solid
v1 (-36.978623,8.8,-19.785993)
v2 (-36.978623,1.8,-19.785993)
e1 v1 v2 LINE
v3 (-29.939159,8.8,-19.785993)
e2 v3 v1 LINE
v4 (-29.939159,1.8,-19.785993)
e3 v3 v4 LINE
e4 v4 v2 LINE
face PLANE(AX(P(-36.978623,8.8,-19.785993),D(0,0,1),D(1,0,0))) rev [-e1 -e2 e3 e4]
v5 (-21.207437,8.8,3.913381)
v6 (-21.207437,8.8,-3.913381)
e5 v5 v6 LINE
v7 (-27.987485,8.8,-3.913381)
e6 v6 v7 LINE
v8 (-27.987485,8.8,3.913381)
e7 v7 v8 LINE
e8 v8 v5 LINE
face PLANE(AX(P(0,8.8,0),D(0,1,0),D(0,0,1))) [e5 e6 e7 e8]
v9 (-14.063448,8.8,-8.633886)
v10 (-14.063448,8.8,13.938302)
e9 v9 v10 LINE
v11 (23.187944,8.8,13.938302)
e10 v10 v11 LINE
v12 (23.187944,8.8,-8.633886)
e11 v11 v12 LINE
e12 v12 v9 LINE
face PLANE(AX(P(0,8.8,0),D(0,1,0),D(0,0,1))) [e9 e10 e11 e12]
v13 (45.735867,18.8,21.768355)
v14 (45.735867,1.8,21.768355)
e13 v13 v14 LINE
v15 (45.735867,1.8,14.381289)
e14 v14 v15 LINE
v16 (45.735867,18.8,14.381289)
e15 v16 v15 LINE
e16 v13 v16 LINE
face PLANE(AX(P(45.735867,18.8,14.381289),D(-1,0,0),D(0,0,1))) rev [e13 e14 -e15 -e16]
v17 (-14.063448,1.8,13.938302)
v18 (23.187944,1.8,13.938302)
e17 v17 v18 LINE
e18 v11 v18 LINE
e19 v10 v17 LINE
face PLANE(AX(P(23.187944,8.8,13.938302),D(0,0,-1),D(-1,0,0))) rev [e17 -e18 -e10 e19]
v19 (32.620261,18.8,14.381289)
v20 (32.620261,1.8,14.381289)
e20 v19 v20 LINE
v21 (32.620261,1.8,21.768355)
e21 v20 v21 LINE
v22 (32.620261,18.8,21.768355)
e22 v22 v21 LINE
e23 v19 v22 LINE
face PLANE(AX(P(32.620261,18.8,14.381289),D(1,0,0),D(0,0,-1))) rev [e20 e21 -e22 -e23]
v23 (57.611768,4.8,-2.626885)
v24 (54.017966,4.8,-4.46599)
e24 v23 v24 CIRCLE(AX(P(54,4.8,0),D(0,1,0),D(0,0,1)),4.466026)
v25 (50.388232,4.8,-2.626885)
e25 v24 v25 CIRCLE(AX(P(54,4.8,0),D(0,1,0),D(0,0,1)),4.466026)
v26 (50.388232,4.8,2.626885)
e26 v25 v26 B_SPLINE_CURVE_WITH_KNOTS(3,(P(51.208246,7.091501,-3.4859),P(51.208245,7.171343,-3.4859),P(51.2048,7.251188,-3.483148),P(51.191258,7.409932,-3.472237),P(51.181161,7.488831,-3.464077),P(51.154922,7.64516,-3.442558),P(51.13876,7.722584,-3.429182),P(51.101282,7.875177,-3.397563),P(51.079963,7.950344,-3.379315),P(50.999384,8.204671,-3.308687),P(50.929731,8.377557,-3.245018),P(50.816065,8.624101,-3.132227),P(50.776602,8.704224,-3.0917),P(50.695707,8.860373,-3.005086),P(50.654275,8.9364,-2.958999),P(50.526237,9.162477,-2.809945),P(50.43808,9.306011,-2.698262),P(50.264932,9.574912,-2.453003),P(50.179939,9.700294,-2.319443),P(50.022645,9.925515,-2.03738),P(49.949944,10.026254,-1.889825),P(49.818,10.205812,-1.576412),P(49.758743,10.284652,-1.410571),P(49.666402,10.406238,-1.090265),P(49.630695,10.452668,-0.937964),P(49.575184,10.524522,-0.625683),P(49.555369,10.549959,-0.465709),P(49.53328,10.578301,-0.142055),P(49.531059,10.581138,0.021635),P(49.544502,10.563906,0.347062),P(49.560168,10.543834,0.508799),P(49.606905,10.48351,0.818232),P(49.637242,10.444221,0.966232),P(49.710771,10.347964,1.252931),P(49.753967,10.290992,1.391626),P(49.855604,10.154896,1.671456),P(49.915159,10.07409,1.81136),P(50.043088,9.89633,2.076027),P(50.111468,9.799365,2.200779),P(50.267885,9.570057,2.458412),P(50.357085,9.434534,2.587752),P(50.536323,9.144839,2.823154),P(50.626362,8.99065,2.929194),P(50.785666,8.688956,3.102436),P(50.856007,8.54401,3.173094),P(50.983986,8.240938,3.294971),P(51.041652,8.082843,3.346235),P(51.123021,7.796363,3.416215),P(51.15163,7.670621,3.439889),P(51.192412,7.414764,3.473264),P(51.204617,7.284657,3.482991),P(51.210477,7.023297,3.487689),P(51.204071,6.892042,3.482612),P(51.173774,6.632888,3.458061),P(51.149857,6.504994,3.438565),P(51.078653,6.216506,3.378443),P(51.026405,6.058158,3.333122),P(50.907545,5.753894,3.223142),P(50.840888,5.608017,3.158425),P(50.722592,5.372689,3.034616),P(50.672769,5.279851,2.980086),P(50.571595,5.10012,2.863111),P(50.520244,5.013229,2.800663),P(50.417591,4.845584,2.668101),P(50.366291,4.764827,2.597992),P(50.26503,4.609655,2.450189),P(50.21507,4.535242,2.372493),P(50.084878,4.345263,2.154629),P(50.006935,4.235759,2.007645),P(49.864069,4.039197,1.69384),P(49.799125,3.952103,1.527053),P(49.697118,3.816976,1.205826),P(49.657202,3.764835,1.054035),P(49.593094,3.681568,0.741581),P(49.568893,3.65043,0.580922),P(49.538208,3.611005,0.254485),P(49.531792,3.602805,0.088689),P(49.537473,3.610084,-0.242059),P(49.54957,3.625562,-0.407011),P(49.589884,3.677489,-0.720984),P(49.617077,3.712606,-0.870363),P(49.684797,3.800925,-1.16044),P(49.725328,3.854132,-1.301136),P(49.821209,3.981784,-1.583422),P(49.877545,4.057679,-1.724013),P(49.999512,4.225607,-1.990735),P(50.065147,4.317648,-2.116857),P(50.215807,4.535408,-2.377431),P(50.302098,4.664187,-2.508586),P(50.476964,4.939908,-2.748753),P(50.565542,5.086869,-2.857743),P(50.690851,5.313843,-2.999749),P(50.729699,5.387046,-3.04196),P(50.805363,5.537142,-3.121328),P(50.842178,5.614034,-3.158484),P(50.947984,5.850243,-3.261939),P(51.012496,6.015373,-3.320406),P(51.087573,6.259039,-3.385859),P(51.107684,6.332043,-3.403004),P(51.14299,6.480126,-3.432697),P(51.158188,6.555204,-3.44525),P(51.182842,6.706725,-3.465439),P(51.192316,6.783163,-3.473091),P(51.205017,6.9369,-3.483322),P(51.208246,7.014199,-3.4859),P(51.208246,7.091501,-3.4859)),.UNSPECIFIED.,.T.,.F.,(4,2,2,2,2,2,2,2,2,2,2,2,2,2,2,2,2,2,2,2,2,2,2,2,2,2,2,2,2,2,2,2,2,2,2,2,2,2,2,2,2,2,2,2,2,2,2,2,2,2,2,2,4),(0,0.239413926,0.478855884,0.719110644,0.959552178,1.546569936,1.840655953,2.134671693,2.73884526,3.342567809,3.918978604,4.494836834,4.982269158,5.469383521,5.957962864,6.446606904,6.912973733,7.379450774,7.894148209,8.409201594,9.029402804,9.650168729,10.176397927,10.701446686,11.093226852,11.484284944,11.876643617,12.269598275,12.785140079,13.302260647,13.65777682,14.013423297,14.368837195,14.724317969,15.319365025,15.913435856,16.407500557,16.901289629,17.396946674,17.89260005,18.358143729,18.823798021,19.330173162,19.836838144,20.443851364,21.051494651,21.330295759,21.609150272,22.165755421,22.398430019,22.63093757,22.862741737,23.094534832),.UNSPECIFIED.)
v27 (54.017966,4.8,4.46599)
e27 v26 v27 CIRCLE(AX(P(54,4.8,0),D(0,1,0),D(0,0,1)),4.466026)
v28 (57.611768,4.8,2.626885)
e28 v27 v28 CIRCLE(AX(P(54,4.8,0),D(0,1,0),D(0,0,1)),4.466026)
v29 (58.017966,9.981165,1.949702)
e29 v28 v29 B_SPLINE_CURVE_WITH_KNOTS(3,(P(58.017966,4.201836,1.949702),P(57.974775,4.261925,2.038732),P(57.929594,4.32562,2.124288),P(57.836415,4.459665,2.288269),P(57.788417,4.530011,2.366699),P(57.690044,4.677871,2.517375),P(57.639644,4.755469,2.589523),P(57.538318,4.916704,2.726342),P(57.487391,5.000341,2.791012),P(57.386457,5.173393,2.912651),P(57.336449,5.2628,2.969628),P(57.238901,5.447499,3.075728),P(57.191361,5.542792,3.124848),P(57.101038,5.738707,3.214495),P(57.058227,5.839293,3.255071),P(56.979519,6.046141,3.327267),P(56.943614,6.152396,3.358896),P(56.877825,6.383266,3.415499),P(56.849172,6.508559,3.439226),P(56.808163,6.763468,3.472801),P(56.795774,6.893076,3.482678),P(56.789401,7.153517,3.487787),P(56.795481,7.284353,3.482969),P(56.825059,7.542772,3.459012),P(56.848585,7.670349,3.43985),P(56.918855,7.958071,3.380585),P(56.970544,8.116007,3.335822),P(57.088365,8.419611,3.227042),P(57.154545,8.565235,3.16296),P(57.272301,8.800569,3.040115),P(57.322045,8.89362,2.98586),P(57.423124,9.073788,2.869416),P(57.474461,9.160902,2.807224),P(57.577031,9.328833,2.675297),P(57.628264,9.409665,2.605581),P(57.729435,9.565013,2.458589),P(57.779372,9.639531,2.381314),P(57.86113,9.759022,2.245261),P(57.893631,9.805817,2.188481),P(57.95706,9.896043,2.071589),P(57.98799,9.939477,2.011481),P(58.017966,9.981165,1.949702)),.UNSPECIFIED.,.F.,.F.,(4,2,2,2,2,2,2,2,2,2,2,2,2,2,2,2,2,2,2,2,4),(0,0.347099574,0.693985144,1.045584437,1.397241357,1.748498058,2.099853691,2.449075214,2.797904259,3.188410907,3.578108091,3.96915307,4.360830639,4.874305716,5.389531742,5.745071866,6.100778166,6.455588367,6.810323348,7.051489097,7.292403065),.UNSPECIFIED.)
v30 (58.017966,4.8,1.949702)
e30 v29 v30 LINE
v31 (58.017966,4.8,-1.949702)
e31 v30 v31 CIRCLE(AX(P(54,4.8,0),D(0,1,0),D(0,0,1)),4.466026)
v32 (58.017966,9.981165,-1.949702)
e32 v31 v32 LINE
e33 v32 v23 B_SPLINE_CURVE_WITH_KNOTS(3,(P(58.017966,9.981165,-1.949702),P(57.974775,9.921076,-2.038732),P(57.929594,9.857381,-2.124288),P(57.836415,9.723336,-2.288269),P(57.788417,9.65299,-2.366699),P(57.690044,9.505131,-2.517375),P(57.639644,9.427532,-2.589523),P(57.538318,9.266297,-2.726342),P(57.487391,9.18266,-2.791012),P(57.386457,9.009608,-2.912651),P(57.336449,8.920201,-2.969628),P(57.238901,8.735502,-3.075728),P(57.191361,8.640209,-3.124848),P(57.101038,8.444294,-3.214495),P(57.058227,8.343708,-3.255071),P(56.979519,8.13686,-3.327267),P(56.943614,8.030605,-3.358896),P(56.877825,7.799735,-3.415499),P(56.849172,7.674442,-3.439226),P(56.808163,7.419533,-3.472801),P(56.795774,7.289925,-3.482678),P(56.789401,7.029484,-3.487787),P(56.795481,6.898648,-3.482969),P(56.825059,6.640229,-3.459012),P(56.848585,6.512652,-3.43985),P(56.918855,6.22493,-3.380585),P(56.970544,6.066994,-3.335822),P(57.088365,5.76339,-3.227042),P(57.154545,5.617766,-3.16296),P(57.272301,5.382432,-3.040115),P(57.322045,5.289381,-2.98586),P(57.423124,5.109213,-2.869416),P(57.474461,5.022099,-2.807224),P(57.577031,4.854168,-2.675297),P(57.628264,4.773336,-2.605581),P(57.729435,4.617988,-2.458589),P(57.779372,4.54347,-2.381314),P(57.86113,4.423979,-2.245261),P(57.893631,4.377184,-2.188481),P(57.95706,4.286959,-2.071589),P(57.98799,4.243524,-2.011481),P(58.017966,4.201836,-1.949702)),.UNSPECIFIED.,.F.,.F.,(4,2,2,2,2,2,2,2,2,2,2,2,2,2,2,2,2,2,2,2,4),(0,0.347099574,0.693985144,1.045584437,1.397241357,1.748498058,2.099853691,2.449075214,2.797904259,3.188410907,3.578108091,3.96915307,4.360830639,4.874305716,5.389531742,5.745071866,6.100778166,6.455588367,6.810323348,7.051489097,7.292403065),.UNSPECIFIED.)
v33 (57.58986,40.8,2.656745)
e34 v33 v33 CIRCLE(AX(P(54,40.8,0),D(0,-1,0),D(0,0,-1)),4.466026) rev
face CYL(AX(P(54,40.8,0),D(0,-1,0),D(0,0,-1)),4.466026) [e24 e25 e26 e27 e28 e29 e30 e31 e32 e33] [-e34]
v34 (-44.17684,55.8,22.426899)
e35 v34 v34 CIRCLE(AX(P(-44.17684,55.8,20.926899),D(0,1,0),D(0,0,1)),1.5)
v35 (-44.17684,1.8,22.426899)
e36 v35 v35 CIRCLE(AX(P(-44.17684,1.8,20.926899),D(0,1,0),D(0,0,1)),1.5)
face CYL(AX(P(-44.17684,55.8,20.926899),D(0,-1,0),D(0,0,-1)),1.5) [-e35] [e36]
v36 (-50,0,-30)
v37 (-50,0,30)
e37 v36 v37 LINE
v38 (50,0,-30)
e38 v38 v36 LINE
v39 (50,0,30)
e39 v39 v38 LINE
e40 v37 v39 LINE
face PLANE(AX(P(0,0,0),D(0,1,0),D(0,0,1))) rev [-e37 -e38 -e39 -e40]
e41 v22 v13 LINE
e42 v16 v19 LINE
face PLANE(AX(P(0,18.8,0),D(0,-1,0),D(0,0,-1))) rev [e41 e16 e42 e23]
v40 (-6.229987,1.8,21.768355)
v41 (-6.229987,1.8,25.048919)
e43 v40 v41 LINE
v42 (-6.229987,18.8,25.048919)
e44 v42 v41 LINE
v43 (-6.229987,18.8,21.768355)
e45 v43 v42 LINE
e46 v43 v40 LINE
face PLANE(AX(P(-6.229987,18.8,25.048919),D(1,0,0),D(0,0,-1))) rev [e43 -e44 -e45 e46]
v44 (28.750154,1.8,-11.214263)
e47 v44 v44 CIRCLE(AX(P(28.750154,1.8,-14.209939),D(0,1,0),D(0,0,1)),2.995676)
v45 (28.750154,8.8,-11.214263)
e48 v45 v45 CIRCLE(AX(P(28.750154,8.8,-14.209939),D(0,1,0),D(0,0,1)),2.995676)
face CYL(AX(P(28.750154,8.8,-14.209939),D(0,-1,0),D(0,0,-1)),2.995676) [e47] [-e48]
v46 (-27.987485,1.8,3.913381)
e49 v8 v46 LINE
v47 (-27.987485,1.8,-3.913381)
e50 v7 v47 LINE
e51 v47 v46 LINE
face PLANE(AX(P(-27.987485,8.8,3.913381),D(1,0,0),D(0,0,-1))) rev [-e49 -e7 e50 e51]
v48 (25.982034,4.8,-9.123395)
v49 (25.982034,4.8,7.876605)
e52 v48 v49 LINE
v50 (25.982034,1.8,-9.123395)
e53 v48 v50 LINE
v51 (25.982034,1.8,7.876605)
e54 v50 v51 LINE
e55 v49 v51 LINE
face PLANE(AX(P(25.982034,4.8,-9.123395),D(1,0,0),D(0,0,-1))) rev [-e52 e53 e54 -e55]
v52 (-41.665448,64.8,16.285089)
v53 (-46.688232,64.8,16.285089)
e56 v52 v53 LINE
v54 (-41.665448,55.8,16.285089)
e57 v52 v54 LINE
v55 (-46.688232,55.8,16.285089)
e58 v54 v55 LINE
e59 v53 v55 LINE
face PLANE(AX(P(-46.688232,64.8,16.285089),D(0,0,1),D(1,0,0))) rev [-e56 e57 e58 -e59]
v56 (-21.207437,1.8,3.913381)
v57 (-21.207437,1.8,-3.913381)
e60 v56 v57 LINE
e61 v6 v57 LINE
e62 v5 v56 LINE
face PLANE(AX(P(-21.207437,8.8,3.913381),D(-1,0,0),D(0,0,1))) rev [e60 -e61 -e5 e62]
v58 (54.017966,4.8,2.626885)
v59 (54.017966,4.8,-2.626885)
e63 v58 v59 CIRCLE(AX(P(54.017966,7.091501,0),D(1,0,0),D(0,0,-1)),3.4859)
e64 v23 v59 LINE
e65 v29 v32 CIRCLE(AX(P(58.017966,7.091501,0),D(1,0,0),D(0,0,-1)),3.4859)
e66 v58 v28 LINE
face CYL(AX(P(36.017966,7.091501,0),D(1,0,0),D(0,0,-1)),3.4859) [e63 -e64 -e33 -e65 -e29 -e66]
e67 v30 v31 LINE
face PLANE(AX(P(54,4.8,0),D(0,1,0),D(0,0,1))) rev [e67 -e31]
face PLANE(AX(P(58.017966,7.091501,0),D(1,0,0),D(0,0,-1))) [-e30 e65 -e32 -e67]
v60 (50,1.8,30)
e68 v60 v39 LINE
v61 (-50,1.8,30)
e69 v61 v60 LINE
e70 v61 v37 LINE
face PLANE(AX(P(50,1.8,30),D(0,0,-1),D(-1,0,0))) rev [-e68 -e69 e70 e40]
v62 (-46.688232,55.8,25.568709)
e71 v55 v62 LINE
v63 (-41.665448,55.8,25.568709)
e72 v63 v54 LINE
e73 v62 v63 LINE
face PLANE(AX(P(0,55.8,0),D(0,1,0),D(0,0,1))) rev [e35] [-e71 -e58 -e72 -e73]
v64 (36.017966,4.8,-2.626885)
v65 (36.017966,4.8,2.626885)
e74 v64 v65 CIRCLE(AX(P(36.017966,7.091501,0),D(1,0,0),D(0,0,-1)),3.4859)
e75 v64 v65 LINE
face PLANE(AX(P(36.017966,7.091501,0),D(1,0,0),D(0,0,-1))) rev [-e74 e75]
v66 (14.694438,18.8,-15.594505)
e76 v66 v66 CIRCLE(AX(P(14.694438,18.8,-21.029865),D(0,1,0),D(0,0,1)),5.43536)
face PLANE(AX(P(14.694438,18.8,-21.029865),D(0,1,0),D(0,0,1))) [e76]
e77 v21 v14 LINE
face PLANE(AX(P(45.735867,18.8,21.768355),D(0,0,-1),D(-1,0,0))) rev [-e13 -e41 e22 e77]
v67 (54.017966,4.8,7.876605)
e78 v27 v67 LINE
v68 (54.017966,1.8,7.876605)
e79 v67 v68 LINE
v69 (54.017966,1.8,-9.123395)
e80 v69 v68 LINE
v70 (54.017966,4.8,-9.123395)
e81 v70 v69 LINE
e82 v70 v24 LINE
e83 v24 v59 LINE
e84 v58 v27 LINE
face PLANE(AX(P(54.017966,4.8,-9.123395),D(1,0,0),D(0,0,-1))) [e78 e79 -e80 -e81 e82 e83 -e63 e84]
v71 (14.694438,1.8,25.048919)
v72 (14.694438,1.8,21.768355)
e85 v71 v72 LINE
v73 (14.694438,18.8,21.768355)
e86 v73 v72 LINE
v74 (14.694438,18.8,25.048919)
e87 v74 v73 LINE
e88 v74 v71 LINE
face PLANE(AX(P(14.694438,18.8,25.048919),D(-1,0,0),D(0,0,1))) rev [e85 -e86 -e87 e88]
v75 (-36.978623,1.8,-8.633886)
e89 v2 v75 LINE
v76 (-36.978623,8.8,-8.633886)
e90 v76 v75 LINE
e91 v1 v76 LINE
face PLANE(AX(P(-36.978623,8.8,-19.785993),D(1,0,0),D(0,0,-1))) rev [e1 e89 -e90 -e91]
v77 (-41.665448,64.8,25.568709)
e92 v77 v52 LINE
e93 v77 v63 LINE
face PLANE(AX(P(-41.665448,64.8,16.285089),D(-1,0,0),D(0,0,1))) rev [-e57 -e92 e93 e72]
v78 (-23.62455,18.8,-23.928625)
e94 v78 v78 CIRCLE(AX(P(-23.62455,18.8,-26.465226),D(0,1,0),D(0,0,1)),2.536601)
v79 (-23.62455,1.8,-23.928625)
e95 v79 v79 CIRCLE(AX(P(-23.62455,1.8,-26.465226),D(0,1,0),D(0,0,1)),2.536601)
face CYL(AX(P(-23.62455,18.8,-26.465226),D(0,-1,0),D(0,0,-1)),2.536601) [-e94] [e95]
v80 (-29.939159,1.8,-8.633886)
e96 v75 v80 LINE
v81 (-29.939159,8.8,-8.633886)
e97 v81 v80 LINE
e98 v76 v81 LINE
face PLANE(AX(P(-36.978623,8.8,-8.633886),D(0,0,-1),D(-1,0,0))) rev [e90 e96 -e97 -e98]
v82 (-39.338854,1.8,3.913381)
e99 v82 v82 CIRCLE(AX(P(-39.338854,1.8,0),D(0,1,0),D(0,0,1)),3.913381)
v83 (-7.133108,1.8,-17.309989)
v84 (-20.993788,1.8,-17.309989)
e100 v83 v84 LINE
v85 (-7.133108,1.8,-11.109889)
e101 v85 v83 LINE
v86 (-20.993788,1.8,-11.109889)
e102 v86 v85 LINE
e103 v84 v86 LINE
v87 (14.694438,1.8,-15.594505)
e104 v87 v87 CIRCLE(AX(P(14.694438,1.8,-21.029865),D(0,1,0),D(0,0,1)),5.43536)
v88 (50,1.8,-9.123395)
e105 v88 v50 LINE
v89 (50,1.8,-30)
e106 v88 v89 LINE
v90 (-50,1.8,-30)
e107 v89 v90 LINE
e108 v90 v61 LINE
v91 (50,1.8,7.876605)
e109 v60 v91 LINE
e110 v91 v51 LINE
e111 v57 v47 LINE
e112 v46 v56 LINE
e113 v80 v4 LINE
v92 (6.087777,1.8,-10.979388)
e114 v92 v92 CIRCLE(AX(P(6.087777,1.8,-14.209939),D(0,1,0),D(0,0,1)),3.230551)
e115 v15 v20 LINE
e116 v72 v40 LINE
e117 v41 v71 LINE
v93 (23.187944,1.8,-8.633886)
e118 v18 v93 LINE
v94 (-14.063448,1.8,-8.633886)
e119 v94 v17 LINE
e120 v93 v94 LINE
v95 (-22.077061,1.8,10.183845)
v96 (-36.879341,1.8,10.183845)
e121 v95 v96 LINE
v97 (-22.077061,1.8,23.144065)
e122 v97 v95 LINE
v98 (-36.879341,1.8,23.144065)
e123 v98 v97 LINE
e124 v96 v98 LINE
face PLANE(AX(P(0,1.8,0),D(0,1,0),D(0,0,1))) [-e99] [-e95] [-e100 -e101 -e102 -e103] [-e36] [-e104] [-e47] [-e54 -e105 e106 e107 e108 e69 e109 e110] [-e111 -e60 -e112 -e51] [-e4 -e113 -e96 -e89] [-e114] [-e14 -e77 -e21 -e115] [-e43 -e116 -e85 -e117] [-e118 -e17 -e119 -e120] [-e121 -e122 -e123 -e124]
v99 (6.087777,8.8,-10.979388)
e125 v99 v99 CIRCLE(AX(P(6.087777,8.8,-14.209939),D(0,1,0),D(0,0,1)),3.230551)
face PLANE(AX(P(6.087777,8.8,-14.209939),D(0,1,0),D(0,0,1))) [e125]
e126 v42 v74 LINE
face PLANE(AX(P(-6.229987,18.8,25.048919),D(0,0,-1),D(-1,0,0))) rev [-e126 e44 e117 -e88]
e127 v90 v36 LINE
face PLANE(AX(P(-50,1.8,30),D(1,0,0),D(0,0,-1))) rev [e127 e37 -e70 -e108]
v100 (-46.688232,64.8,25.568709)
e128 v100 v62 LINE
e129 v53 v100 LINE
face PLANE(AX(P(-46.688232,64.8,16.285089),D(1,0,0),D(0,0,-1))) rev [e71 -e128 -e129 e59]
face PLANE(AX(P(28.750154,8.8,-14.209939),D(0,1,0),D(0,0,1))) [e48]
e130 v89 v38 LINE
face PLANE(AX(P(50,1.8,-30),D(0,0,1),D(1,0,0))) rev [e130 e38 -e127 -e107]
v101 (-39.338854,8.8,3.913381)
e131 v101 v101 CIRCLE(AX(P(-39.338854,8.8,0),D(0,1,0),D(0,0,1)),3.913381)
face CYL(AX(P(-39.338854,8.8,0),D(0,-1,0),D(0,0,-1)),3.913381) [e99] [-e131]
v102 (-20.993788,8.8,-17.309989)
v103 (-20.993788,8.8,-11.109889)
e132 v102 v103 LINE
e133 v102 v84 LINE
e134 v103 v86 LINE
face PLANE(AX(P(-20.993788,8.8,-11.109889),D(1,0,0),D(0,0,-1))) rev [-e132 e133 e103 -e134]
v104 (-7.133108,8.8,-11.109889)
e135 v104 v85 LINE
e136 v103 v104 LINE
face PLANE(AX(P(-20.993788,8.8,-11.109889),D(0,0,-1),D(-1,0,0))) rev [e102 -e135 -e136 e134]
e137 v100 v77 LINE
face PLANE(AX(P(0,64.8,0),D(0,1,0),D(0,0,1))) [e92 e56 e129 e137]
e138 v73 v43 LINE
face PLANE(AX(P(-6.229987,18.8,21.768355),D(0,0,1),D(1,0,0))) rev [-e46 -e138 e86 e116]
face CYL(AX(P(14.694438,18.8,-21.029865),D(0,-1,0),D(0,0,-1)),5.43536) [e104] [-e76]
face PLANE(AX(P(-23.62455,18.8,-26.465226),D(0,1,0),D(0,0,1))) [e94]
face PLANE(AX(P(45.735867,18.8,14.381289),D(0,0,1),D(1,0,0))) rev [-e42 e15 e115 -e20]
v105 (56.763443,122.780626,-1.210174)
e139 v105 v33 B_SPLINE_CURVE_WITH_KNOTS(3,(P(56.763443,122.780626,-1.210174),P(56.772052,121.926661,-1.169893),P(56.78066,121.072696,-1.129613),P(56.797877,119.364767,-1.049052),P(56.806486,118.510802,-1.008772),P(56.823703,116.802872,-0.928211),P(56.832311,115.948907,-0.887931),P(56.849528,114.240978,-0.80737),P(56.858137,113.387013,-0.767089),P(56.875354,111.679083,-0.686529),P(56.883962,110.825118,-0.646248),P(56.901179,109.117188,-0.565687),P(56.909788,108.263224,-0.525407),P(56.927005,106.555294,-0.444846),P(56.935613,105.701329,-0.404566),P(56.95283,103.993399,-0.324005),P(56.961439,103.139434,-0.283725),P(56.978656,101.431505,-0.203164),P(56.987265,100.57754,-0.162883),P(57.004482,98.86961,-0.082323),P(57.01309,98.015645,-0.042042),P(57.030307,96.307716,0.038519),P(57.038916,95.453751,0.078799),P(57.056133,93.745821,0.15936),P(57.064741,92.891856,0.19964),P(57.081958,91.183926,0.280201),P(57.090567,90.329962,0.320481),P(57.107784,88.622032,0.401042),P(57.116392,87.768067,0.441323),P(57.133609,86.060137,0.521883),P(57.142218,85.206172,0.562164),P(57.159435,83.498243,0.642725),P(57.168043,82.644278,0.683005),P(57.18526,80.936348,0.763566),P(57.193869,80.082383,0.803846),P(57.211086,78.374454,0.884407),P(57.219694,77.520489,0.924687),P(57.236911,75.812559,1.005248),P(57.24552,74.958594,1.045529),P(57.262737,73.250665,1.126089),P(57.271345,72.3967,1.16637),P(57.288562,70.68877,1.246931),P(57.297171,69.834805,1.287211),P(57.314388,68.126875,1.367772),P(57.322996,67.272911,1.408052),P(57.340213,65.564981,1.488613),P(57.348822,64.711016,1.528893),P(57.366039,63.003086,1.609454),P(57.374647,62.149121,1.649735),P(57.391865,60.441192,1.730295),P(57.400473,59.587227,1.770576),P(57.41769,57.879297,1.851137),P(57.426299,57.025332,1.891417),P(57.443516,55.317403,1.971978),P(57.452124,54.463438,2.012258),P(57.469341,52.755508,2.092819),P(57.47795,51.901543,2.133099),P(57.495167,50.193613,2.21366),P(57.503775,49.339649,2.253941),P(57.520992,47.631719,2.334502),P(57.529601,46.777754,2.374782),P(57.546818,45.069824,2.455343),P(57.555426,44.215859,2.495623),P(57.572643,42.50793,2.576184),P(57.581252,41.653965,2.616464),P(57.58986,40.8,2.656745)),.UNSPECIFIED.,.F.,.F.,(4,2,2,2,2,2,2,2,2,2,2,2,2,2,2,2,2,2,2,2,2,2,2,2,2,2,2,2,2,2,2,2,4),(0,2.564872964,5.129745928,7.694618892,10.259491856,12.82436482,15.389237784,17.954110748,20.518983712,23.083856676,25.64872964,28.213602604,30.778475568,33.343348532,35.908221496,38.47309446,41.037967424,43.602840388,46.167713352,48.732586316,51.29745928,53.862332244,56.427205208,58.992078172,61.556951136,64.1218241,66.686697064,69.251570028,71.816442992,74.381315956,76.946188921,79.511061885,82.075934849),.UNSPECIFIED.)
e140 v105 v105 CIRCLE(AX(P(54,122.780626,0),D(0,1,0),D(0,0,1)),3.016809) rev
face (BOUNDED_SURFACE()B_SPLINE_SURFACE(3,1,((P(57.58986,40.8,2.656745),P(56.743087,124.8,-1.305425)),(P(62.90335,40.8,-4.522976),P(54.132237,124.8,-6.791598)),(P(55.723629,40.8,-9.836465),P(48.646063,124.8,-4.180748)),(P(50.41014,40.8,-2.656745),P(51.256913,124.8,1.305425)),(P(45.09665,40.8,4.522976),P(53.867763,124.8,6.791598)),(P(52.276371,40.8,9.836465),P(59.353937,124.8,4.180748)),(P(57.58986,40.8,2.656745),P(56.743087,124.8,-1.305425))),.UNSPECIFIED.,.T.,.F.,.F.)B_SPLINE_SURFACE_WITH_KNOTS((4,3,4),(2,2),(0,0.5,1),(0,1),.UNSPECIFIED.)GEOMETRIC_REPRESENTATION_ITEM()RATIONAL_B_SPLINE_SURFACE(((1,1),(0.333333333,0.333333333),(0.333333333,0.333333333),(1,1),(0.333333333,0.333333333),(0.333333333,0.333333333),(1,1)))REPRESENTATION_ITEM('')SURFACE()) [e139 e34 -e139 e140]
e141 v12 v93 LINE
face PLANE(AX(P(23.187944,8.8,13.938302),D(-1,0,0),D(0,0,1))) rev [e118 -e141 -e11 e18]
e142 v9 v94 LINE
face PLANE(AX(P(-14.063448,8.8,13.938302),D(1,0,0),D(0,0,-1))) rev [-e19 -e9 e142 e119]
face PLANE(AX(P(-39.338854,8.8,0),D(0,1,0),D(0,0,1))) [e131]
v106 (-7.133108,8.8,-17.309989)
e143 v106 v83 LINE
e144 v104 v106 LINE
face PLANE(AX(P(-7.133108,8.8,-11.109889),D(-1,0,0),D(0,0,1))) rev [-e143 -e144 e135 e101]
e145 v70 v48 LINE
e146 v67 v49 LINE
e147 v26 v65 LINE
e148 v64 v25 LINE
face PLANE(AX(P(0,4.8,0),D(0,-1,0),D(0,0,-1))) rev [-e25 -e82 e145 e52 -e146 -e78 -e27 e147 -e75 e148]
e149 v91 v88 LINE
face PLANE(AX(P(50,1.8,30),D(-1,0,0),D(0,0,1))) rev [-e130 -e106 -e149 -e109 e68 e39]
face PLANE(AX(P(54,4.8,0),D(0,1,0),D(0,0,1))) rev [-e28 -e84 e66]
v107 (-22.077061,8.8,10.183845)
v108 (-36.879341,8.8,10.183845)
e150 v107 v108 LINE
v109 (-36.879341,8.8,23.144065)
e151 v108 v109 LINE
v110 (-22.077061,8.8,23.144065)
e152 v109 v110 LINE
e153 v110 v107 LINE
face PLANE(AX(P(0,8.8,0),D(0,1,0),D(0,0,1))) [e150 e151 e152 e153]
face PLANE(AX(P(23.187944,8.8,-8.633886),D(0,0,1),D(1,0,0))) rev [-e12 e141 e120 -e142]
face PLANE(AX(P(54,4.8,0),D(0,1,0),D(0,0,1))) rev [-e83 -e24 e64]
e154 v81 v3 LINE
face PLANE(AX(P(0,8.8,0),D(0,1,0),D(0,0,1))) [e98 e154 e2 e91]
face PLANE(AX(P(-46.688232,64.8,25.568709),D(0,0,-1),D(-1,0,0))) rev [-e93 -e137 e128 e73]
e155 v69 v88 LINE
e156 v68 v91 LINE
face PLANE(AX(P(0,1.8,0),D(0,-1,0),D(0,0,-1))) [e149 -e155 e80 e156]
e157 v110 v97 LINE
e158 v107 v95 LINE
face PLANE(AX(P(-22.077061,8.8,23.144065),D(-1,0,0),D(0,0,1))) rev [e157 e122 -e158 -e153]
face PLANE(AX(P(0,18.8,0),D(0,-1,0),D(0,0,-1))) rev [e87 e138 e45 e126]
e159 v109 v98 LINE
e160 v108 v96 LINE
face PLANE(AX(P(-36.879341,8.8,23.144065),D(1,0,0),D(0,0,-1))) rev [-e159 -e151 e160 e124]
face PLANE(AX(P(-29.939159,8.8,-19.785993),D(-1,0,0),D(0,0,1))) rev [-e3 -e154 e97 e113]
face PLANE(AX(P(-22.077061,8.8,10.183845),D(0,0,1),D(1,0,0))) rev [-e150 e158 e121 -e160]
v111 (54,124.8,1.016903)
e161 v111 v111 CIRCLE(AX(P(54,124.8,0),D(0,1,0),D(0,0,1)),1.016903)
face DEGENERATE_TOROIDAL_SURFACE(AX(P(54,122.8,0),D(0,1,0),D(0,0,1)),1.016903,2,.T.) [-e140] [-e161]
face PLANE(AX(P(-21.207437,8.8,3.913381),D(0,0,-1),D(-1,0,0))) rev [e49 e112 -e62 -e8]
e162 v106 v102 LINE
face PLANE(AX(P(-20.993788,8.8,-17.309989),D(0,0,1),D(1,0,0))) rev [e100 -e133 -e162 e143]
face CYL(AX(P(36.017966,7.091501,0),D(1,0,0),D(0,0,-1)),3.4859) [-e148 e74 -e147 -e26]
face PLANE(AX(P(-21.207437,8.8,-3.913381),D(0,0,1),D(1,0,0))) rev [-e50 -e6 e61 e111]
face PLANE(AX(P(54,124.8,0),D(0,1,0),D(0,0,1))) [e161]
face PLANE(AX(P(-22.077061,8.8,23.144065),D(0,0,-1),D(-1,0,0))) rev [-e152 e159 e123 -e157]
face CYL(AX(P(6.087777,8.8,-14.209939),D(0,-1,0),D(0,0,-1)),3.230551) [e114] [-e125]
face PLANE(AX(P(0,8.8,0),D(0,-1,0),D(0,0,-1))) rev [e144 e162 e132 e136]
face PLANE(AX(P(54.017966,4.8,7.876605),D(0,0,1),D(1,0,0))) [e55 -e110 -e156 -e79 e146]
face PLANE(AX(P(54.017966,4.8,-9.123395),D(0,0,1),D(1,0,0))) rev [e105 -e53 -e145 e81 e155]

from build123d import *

# Parameters (mm, degrees)
SKETCH_1_W           = 100
SKETCH_1_H           = 60
EXTRUDE_1_DEPTH      = 1.8
SKETCH_2_W           = 28.035932228
SKETCH_2_H           = 17
EXTRUDE_2_DEPTH      = 3
SKETCH_3_R           = 4.4660261
EXTRUDE_3_DEPTH      = 36
FILLET_1_R           = 2
EXTRUDE_4_DEPTH      = 4
EXTRUDE_4_DEPTH_BACK = 18
SKETCH_5_R           = 3.485899794
SKETCH_6_R           = 1.5
EXTRUDE_5_DEPTH      = 54
SKETCH_7_W           = 5.022784178
SKETCH_7_H           = 9.283620646
EXTRUDE_6_DEPTH      = 9
SKETCH_8_R           = 2.995676271
SKETCH_8_R_2         = 3.913381196
SKETCH_8_R_3         = 3.23055129
SKETCH_8_W           = 14.80227989
SKETCH_8_H           = 12.960220437
SKETCH_8_W_2         = 37.251391954
SKETCH_8_H_2         = 22.572187892
SKETCH_8_W_3         = 7.03946311
SKETCH_8_H_3         = 11.152107008
SKETCH_8_W_4         = 13.860680023
SKETCH_8_H_4         = 6.200099882
SKETCH_8_W_5         = 6.780047866
SKETCH_8_H_5         = 7.826762392
EXTRUDE_7_DEPTH      = 7
SKETCH_9_R           = 5.435360368
SKETCH_9_R_2         = 2.536600753
SKETCH_9_W           = 13.115606058
SKETCH_9_H           = 7.387065748
SKETCH_9_W_2         = 20.924425377
SKETCH_9_H_2         = 3.280564091
EXTRUDE_8_DEPTH      = 17


with BuildPart() as part:
    # 草图1 → 凸台-拉伸1 (new body)
    with BuildSketch(Plane(origin=(0, 0, 0), x_dir=(1, 0, 0), z_dir=(0, 1, 0))):
        Rectangle(SKETCH_1_W, SKETCH_1_H)
    extrude(amount=EXTRUDE_1_DEPTH)

    # 草图2 → 凸台-拉伸2 (add)
    with BuildSketch(Plane(origin=(0, 1.8, 0), x_dir=(1, 0, 0), z_dir=(0, 1, 0))):
        with Locations((40, 0.62339544)):
            Rectangle(SKETCH_2_W, SKETCH_2_H)
    extrude(amount=EXTRUDE_2_DEPTH)

    # 草图3 → 凸台-拉伸3 (add)
    with BuildSketch(Plane(origin=(0, 4.8, 0), x_dir=(1, 0, 0), z_dir=(0, 1, 0))):
        with Locations(Location((54, 0, 0), (0, 0, 89.769507549))):
            Circle(SKETCH_3_R)
    extrude(amount=EXTRUDE_3_DEPTH)

    # 放样1: read off the stored shape, not the designer's step
    # 放样1: loft between two sections, ruled curve by curve
    loft_1_from = [
        Edge.make_bspline([(57.589860253, 40.8, 2.656744716), (62.903349686, 40.8, -4.52297579), (55.72362918, 40.8, -9.836465222), (50.410139747, 40.8, -2.656744716), (45.096650314, 40.8, 4.52297579), (52.27637082, 40.8, 9.836465222), (57.589860253, 40.8, 2.656744716)], [0, 0, 0, 0, 0.5, 0.5, 0.5, 1, 1, 1, 1], 3, [1, 0.333333333, 0.333333333, 1, 0.333333333, 0.333333333, 1]),
    ]
    loft_1_to = [
        Edge.make_bspline([(56.743086688, 124.8, -1.30542509), (54.132236508, 124.8, -6.791598467), (48.646063131, 124.8, -4.180748287), (51.256913312, 124.8, 1.30542509), (53.867763492, 124.8, 6.791598467), (59.353936869, 124.8, 4.180748287), (56.743086688, 124.8, -1.30542509)], [0, 0, 0, 0, 0.5, 0.5, 0.5, 1, 1, 1, 1], 3, [1, 0.333333333, 0.333333333, 1, 0.333333333, 0.333333333, 1]),
    ]
    loft_1 = Solid(Shell([*[Face.make_surface_from_curves(loft_1_from[k], loft_1_to[k]) for k in range(1)], Face(Wire(loft_1_from)), Face(Wire(loft_1_to))]))
    add(loft_1)

    # 圆角1
    fillet_1_edges = [part.edges().sort_by_distance(p)[0] for p in [
        (51.256913312, 124.8, 1.30542509),
    ]]
    fillet(fillet_1_edges, radius=FILLET_1_R)

    # 草图5 → 凸台-拉伸4 (add, two sides: drawn at the far end of the back side and taken through both)
    with BuildSketch(Plane(origin=(54.017966114, 0, 0), x_dir=(0, 0, -1), z_dir=(1, 0, 0)).offset(-EXTRUDE_4_DEPTH_BACK)):
        with Locations((0, 7.091500567)):
            Circle(SKETCH_5_R)
    extrude(amount=EXTRUDE_4_DEPTH + EXTRUDE_4_DEPTH_BACK)

    # 草图6 → 凸台-拉伸5 (add)
    with BuildSketch(Plane(origin=(0, 1.8, 0), x_dir=(1, 0, 0), z_dir=(0, 1, 0))):
        with Locations(Location((-44.176840226, -20.926898996, 0), (0, 0, 270))):
            Circle(SKETCH_6_R)
    extrude(amount=EXTRUDE_5_DEPTH)

    # 草图7 → 凸台-拉伸6 (add)
    with BuildSketch(Plane(origin=(0, 55.8, 0), x_dir=(1, 0, 0), z_dir=(0, 1, 0))):
        with Locations((-44.176840226, -20.926898996)):
            Rectangle(SKETCH_7_W, SKETCH_7_H)
    extrude(amount=EXTRUDE_6_DEPTH)

    # 草图8 → 凸台-拉伸7 (add)
    with BuildSketch(Plane(origin=(0, 1.8, 0), x_dir=(1, 0, 0), z_dir=(0, 1, 0))):
        with Locations(Location((28.750153934, 14.209939116, 0), (0, 0, 270))):
            Circle(SKETCH_8_R)
        with Locations(Location((-39.338854446, 0, 0), (0, 0, 270))):
            Circle(SKETCH_8_R_2)
        with Locations(Location((6.087776547, 14.209939116, 0), (0, 0, 270))):
            Circle(SKETCH_8_R_3)
        with Locations((-29.478201176, -16.663954757)):
            Rectangle(SKETCH_8_W, SKETCH_8_H)
        with Locations((4.562248459, -2.652208334)):
            Rectangle(SKETCH_8_W_2, SKETCH_8_H_2)
        with Locations((-33.458891008, 14.209939116)):
            Rectangle(SKETCH_8_W_3, SKETCH_8_H_3)
        with Locations((-14.063447519, 14.209939116)):
            Rectangle(SKETCH_8_W_4, SKETCH_8_H_4)
        with Locations((-24.597460964, 0)):
            Rectangle(SKETCH_8_W_5, SKETCH_8_H_5)
    extrude(amount=EXTRUDE_7_DEPTH)

    # 草图9 → 凸台-拉伸8 (add)
    with BuildSketch(Plane(origin=(0, 1.8, 0), x_dir=(1, 0, 0), z_dir=(0, 1, 0))):
        with Locations(Location((14.694438418, 21.029865225, 0), (0, 0, 270))):
            Circle(SKETCH_9_R)
        with Locations(Location((-23.624550245, 26.465225593, 0), (0, 0, 270))):
            Circle(SKETCH_9_R_2)
        with Locations((39.178063873, -18.07482194)):
            Rectangle(SKETCH_9_W, SKETCH_9_H)
        with Locations((4.232225729, -23.408636859)):
            Rectangle(SKETCH_9_W_2, SKETCH_9_H_2)
    extrude(amount=EXTRUDE_8_DEPTH)


solid = part.part
